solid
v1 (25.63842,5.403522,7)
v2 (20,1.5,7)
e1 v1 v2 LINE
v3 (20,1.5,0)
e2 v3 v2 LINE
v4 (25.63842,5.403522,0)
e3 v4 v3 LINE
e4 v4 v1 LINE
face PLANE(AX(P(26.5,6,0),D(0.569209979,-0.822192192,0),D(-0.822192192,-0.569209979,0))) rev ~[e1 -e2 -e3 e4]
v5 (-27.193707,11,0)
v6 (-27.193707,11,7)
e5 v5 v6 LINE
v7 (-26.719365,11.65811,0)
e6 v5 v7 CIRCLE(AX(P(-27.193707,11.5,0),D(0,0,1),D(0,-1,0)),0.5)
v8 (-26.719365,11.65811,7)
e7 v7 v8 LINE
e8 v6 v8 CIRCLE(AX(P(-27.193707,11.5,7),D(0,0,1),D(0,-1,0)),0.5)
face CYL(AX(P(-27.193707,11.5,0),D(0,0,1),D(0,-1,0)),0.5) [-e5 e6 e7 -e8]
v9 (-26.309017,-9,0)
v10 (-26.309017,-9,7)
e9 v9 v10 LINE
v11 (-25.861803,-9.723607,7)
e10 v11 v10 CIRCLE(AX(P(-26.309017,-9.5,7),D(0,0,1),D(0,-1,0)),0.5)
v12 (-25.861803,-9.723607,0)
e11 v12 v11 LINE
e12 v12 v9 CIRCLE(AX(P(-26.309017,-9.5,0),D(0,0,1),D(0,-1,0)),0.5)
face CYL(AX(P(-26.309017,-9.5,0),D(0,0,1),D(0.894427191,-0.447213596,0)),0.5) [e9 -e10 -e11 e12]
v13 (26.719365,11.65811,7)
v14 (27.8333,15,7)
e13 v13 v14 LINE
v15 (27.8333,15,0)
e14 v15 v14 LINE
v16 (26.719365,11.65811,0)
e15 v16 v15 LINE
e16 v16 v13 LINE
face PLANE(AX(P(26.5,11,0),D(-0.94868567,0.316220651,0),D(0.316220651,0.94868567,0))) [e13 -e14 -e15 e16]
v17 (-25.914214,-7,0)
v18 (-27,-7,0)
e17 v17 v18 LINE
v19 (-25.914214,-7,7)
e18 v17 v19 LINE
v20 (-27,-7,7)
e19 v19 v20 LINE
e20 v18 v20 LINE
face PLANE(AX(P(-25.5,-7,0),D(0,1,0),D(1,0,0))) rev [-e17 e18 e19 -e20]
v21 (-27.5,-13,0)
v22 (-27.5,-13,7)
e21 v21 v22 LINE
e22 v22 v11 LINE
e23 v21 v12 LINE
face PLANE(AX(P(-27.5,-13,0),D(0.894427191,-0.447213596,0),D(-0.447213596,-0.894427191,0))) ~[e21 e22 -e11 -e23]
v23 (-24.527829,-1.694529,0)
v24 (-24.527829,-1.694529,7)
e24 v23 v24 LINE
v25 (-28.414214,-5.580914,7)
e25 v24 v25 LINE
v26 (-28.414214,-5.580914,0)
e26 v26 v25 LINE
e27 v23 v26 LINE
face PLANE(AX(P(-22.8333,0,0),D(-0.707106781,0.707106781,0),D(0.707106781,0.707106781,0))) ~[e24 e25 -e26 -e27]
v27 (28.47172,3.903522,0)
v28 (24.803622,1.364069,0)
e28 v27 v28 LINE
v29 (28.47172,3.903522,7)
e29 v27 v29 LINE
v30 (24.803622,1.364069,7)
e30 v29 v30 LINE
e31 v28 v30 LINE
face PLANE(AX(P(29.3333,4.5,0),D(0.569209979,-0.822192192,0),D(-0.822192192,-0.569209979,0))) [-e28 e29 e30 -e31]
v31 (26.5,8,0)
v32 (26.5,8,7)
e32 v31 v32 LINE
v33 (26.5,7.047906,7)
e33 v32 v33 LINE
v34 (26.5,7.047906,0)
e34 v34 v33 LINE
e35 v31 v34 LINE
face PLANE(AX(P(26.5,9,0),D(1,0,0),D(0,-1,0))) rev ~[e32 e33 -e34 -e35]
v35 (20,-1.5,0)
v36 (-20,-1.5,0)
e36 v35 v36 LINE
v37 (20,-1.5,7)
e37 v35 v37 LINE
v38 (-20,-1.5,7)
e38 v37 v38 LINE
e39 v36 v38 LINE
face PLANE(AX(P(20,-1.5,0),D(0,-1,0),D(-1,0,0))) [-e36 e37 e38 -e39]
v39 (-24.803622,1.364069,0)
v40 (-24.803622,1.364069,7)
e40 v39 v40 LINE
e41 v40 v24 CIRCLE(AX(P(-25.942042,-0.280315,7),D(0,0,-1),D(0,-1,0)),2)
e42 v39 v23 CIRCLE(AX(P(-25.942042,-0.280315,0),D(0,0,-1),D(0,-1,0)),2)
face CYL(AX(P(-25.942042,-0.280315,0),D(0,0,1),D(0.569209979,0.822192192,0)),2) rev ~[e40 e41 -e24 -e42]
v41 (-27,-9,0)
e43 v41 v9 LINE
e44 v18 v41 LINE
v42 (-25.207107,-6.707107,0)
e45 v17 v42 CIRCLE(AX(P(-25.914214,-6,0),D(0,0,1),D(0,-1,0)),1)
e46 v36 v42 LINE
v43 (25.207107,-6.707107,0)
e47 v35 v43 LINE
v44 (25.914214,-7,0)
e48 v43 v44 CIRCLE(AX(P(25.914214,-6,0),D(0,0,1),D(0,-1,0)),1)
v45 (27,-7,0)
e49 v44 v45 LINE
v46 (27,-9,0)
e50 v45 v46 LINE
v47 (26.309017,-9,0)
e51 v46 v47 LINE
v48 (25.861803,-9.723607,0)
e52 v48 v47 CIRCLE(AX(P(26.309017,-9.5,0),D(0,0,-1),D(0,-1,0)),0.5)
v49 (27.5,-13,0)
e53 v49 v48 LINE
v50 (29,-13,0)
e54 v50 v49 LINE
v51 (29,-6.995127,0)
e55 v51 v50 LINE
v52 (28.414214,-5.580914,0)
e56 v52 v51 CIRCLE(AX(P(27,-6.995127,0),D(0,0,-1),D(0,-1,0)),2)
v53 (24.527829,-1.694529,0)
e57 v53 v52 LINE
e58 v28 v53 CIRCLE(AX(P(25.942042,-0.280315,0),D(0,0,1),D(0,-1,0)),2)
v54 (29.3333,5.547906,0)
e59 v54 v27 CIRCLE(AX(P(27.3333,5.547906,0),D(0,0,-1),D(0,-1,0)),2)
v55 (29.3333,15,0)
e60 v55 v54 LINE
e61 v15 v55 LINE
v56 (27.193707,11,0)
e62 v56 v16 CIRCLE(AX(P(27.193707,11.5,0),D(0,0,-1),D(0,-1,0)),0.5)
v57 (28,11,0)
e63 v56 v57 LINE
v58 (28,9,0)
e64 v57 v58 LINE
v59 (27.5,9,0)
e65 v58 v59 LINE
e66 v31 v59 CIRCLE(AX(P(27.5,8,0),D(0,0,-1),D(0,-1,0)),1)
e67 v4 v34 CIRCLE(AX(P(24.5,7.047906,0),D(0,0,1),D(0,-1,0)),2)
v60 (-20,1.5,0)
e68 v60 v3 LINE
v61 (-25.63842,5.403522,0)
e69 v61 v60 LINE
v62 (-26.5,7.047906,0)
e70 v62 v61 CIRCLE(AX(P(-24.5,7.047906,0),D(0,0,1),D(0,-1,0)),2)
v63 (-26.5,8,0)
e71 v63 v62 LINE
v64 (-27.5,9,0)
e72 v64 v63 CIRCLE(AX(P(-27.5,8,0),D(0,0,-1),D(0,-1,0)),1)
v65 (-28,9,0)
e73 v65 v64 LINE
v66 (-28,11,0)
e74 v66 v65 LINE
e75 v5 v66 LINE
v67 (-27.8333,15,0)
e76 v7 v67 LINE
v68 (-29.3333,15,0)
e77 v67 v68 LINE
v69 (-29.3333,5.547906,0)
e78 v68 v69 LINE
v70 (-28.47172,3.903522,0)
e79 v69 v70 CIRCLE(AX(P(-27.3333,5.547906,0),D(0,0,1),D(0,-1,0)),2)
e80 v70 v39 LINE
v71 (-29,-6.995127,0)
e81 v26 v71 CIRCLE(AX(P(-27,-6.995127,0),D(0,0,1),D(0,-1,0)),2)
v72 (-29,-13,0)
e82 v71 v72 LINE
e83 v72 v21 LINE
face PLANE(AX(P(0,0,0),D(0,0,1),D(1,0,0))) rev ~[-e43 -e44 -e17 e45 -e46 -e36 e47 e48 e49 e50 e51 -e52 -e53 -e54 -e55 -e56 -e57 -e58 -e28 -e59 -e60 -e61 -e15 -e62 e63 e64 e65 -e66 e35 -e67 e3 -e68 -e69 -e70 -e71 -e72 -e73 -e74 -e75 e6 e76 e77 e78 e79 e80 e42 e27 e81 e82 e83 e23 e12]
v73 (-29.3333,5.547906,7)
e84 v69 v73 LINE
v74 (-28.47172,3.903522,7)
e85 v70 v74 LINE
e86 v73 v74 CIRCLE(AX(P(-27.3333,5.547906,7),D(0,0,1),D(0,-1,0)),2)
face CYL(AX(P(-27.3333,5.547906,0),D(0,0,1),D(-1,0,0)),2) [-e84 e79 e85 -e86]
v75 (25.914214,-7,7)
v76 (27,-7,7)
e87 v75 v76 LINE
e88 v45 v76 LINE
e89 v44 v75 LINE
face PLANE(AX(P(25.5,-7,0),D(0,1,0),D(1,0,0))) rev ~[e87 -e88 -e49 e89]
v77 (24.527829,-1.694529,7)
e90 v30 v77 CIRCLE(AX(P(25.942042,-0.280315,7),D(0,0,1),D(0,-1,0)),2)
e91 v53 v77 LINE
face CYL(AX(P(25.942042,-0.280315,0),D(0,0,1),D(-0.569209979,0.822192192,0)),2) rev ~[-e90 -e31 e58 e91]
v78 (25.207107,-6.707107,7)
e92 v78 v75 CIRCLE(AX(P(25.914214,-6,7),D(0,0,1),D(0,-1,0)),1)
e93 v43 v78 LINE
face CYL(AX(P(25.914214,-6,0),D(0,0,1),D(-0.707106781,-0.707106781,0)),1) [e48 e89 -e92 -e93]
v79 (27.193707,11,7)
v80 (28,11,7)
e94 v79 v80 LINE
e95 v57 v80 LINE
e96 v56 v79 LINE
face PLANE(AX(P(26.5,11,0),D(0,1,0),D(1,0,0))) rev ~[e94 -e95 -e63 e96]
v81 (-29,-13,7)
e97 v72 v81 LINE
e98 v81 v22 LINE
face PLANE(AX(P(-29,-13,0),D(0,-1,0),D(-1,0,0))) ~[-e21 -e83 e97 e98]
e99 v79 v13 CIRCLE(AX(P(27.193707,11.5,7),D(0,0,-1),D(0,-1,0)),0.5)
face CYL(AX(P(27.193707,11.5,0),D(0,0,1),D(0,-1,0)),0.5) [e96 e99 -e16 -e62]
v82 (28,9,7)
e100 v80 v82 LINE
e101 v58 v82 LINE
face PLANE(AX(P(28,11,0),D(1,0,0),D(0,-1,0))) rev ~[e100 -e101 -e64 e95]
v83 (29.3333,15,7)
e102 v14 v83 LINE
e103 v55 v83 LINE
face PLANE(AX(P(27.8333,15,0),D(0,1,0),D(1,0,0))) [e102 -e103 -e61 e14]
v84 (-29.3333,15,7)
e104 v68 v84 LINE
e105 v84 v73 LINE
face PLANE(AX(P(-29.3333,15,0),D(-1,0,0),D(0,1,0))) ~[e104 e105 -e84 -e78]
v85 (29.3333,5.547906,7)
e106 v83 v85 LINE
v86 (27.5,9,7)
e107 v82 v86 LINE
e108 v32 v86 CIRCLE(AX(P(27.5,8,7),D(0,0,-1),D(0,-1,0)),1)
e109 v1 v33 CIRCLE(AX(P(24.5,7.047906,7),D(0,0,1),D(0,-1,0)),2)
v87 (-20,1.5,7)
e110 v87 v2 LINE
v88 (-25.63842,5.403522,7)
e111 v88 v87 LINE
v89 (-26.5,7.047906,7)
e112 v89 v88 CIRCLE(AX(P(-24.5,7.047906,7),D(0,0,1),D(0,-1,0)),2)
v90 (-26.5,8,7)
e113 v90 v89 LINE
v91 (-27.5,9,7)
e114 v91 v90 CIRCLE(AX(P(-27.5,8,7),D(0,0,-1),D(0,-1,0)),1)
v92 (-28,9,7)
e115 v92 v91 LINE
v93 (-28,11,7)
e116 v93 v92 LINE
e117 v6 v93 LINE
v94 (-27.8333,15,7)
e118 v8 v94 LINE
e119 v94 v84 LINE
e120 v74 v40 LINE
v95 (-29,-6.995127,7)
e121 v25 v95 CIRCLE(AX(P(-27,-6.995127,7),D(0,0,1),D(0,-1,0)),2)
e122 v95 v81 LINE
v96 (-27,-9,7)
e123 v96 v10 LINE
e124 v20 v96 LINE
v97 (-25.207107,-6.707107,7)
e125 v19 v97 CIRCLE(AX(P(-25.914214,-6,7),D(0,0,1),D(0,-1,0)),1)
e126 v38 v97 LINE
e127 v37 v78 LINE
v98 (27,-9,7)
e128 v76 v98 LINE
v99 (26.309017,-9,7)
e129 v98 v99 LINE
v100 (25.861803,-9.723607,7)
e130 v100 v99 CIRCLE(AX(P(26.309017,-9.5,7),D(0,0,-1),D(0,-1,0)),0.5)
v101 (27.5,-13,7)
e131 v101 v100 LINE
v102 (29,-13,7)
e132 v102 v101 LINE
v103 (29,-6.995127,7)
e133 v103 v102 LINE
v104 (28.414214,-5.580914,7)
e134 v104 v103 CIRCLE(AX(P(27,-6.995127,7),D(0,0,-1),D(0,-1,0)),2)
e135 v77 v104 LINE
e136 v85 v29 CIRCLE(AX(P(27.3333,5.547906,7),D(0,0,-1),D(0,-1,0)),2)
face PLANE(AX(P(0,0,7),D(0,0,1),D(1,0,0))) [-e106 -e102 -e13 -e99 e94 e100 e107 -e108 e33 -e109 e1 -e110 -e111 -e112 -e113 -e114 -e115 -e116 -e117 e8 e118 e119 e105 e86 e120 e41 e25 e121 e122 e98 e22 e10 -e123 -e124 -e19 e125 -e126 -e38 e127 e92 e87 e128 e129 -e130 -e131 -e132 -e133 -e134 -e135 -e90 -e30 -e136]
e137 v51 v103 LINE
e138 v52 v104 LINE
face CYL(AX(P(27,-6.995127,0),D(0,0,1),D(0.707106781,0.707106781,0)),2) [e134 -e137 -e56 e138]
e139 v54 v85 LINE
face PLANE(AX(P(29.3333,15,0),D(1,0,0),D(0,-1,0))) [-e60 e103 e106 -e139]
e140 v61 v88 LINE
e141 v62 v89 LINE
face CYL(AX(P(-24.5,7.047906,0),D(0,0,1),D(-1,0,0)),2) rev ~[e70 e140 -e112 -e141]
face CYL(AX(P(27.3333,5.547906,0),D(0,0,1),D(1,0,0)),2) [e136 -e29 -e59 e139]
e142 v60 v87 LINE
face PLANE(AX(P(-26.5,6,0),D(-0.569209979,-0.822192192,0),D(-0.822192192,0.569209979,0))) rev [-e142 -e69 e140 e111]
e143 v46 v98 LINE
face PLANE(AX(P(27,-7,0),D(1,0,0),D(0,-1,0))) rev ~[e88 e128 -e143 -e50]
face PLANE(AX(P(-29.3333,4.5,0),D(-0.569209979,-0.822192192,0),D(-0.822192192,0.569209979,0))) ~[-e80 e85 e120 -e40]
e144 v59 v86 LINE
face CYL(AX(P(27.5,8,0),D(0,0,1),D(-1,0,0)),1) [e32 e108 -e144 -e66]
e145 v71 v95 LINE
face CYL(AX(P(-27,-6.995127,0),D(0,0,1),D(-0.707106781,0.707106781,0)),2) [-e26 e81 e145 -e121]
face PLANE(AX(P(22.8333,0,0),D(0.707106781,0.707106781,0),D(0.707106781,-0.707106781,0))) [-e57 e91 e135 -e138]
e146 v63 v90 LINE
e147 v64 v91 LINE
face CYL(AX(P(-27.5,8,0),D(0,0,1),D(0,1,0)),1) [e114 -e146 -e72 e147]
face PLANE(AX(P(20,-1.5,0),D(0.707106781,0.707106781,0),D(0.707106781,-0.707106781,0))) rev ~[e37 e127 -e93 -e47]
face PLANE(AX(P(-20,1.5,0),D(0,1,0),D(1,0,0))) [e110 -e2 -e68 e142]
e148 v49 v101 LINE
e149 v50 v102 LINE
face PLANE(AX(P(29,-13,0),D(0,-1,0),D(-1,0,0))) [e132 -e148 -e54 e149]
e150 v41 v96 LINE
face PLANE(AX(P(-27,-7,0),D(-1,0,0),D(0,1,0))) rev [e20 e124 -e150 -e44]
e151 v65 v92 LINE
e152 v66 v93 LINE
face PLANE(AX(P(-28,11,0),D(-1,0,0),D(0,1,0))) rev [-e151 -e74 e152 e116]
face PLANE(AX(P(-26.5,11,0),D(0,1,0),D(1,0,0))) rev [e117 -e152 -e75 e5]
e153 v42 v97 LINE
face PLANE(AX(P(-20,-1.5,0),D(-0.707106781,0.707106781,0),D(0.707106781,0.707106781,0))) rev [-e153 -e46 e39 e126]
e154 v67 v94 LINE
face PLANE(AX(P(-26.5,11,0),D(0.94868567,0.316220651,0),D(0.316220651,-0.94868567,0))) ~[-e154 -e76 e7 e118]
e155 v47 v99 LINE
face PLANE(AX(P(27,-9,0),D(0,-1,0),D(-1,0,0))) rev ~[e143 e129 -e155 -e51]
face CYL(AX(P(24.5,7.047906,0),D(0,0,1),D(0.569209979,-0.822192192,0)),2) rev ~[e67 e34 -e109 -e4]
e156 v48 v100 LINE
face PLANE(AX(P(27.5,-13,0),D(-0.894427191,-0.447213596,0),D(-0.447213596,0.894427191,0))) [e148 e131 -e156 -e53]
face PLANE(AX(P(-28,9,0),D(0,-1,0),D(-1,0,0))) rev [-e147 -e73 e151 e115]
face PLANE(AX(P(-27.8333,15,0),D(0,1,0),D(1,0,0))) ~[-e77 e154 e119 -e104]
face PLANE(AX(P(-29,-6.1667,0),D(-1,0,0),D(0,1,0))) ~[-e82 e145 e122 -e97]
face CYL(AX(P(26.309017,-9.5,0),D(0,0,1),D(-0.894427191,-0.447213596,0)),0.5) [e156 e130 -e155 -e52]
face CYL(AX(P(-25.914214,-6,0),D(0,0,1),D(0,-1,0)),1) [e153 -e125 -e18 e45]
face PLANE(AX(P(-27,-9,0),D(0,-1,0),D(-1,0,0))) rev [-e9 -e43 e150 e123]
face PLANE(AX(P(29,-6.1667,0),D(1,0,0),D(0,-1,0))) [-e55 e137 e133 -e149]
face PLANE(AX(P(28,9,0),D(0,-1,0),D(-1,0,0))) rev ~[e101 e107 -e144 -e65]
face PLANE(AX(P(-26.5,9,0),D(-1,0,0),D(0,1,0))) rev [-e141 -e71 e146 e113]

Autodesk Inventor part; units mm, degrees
ref_plane "YZ Plane" through (0, 0, 0) normal (1, 0, 0) x (0, 1, 0)
ref_plane "XZ Plane" through (0, 0, 0) normal (0, 1, 0) x (-1, 0, 0)
ref_plane "XY Plane" through (0, 0, 0) normal (0, 0, 1) x (1, 0, 0)
sketch "Sketch1" plane through (0, 0, 0) normal (0, 0, 1) x (1, 0, 0)
  line L0 (-28, 11) -> (28, 11)
  line L1 (28, 11) -> (28, 9)
  line L2 (28, 9) -> (-28, 9)
  line L3 (-28, 9) -> (-28, 11)
  line L4 (-27, -7) -> (27, -7)
  line L5 (27, -7) -> (27, -9)
  line L6 (27, -9) -> (-27, -9)
  line L7 (-27, -9) -> (-27, -7)
  line L8 (-20, 1.5) -> (20, 1.5)
  line L9 (20, 1.5) -> (20, -1.5)
  line L10 (20, -1.5) -> (-20, -1.5)
  line L11 (-20, -1.5) -> (-20, 1.5)
  line L12 (26.5, 11) -> (27.8333, 15)
  line L13 (27.8333, 15) -> (29.3333, 15)
  line L14 (29.3333, 15) -> (29.3333, 4.5)
  line L15 (29.3333, 4.5) -> (22.8333, 0)
  line L16 (22.8333, 0) -> (29, -6.1667)
  line L17 (29, -6.1667) -> (29, -13)
  line L18 (29, -13) -> (27.5, -13)
  line L19 (27.5, -13) -> (25.5, -9)
  line L20 (20, -1.5) -> (25.5, -7)
  line L21 (26.5, 9) -> (28, 9)
  line L22 (28, 9) -> (28, 11)
  line L23 (28, 11) -> (26.5, 11)
  line L24 (26.5, 9) -> (26.5, 6)
  line L25 (26.5, 6) -> (20, 1.5)
  point P0 (0, 0)
  point P1 (0, 9)
  point P2 (0, -7)
  point P3 (0, -1.5)
  point P4 (20, 0)
  dimension "d0" = 2
  dimension "d1" = 2
  dimension "d2" = 56
  dimension "d3" = 54
  dimension "d4" = 7
  dimension "d6" = 3
  dimension "d7" = 40
  dimension "d8" = 1.5
  dimension "d9" = 1.5
  dimension "d10" = 1.5
  dimension "d11" = 1.5
  dimension "d13" = 2
  dimension "d14" = 1.5
  dimension "d16" = 4
  dimension "d17" = 4
  dimension "d18" = 1.5
  dimension "d26" = 3
  dimension "d28" = 15
extrude "Extrusion1" add sketch "Sketch1" along normal blind 7 contours L12 L13 L14 L15 L16 L17 L18 L19 L6 L5 L4 L20 L9 L25 L24 L2 L1 L0
mirror "Mirror1" about plane through (0, 0, 0) normal (1, 0, 0) of "Extrusion1"
sketch "Sketch2" plane through (0, 0, 0) normal (0, 0, 1) x (1, 0, 0)
  line L0 (-20, 1.5) -> (-20, -1.5) projected
  line L1 (20, 1.5) -> (20, -1.5) projected
  line L2 (-20, 1.5) -> (20, 1.5)
  line L3 (20, 1.5) -> (20, -1.5)
  line L4 (20, -1.5) -> (-20, -1.5)
  line L5 (-20, -1.5) -> (-20, 1.5)
  point P0 (0, 0)
extrude "Extrusion2" add sketch "Sketch2" along normal up to surface (7 mm away)
fillet "Fillet1" radius 2 6 edges at (22.8333, 0, 3.5) (-22.8333, 0, 3.5) (-29.3333, 4.5, 3.5) (29.3333, 4.5, 3.5) (29, -6.1667, 3.5) (-29, -6.1667, 3.5)
fillet "Fillet2" radius 1 4 edges at (-26.5, 9, 3.5) (26.5, 9, 3.5) (25.5, -7, 3.5) (-25.5, -7, 3.5)
fillet "Fillet3" radius 0.5 4 edges at (-26.5, 11, 3.5) (26.5, 11, 3.5) (25.5, -9, 3.5) (-25.5, -9, 3.5)
fillet "Fillet4" radius 2 2 edges at (26.5, 6, 3.5) (-26.5, 6, 3.5)
properties part number "conector-rpi-arduino-improved"
